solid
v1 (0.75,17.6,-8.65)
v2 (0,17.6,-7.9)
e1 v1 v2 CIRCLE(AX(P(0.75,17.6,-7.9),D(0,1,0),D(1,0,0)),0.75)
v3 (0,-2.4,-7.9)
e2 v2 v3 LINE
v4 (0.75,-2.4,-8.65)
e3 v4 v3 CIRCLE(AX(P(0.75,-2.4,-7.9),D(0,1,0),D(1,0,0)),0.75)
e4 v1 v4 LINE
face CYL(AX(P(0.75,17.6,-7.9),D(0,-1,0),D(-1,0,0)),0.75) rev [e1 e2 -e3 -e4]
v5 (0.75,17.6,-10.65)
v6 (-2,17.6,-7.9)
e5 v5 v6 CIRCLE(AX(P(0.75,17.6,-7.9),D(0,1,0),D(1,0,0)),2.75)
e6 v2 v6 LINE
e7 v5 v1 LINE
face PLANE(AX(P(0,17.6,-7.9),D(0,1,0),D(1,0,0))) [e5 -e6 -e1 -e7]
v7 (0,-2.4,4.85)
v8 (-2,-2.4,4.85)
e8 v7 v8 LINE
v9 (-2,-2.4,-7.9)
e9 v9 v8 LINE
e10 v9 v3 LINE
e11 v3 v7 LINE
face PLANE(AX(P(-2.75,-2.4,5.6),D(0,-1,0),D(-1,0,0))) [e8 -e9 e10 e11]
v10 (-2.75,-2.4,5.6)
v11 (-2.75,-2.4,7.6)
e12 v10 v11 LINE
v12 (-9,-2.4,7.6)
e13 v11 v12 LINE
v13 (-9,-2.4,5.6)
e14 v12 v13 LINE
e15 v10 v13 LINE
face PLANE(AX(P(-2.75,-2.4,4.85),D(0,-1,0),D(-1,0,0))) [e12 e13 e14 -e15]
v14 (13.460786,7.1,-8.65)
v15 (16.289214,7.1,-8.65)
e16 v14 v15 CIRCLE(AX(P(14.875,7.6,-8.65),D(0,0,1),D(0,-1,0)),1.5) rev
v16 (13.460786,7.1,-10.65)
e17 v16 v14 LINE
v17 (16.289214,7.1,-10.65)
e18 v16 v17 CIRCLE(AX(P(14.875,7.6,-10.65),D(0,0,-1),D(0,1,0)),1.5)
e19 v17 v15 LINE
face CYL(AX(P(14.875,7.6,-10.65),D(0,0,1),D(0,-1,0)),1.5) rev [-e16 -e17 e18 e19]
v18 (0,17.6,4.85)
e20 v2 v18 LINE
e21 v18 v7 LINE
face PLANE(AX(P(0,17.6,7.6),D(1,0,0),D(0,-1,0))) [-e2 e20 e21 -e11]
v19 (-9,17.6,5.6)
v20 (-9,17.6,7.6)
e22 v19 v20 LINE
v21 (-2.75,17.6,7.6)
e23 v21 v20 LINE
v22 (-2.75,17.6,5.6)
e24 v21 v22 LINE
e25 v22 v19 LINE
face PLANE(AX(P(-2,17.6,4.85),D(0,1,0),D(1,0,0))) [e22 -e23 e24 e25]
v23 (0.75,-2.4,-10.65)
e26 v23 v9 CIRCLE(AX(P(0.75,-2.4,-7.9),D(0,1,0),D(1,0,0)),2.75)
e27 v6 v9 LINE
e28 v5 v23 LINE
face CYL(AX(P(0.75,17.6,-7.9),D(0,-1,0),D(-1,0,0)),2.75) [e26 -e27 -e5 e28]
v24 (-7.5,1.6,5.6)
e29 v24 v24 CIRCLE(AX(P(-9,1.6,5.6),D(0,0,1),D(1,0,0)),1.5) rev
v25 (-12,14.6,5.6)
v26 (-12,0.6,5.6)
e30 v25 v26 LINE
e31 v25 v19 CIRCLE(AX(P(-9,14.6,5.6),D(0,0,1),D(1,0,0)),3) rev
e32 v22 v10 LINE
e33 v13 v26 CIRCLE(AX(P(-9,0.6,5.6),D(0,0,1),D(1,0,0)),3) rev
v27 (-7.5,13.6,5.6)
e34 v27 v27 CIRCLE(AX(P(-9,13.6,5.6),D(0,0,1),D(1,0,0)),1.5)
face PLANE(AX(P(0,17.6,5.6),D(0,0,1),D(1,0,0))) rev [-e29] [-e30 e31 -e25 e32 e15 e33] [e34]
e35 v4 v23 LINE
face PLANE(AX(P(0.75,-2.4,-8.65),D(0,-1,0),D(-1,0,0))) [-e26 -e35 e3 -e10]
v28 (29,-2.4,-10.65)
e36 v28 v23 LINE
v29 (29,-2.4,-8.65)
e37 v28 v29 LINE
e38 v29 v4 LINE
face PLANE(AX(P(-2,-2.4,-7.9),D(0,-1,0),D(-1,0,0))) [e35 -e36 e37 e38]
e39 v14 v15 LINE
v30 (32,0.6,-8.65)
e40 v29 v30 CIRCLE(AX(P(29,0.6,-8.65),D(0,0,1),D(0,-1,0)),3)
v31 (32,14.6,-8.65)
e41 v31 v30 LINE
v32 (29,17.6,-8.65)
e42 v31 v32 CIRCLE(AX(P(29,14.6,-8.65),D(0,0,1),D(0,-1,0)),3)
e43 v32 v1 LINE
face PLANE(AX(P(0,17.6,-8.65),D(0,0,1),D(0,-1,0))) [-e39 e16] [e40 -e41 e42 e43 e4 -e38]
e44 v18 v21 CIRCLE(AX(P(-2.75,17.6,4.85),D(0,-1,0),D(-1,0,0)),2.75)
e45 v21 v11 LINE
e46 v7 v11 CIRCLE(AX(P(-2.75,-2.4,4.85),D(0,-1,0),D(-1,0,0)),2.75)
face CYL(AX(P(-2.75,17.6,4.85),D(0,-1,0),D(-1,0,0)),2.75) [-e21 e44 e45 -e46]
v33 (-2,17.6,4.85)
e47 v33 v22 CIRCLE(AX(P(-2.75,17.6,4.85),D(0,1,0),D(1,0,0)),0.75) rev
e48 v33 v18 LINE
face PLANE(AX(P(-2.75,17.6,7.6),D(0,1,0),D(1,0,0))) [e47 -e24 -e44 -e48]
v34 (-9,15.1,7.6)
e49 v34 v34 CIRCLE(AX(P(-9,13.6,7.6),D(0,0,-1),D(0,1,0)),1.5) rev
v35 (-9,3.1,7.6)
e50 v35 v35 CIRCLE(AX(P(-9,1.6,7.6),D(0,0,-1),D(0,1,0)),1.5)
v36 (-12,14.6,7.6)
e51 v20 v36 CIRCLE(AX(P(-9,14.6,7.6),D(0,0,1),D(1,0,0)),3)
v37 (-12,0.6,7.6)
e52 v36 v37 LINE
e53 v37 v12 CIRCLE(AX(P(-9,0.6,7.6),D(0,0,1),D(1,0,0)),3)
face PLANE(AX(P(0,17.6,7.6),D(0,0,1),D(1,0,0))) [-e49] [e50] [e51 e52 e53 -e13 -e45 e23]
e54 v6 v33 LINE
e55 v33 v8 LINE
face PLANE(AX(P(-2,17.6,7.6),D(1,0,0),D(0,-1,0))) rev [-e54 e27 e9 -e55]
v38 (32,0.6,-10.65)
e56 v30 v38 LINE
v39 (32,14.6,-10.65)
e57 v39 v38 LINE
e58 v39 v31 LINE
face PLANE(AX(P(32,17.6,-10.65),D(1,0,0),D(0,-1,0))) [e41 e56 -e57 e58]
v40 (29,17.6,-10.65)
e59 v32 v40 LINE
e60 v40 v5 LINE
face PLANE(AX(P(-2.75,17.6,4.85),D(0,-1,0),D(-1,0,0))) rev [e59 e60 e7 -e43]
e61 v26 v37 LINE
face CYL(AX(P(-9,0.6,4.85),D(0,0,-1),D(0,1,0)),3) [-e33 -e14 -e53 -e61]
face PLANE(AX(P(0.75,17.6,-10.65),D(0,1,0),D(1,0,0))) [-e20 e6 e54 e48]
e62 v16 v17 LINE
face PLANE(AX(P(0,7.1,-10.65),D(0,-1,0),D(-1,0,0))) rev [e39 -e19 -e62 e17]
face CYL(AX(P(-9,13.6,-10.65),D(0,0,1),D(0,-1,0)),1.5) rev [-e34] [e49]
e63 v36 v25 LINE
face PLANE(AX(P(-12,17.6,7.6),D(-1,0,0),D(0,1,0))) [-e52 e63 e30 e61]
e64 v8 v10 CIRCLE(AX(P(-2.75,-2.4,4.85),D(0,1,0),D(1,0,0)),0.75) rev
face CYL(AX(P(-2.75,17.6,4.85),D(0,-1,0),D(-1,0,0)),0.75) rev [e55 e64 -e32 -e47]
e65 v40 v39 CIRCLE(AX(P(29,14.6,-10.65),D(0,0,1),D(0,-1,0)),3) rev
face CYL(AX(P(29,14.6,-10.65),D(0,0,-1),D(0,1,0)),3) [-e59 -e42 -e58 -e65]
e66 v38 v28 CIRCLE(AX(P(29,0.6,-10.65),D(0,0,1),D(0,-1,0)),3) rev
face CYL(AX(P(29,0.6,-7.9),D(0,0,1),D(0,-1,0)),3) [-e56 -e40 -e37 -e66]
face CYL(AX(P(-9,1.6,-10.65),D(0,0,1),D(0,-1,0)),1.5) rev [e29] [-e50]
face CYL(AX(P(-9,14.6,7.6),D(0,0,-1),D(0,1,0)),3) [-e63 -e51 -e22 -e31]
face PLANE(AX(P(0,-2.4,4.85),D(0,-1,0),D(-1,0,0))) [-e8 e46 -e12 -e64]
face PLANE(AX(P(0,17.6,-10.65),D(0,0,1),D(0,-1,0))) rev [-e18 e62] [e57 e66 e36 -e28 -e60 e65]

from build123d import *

# Parameters (mm, degrees)
BASE_FLANGE1_DEPTH    = 10
FILLET1_R             = 3
SKETCH7_R             = 1.5
CUT_EXTRUDE1_DEPTH    = 39.171488051
BODY_MOVE_COPY1_ANGLE = 90


# Sheet-metal steps are written as plain solids
with BuildPart() as part:
    # Sketch1 → Base-Flange1 (new, symmetric)
    with BuildSketch(Plane.XY):
        with BuildLine():
            Line((-12, 0), (-2.75, 0))
            ThreePointArc((-2.75, 0), (-0.805456352, 0.805456352), (0, 2.75))
            Line((0, 2.75), (0, 15.5))
            ThreePointArc((0, 15.5), (0.219669914, 16.030330086), (0.75, 16.25))
            Line((0.75, 16.25), (32, 16.25))
            Line((32, 16.25), (32, 18.25))
            Line((32, 18.25), (0.75, 18.25))
            ThreePointArc((0.75, 18.25), (-1.194543648, 17.444543648), (-2, 15.5))
            Line((-2, 15.5), (-2, 2.75))
            ThreePointArc((-2, 2.75), (-2.219669914, 2.219669914), (-2.75, 2))
            Line((-2.75, 2), (-12, 2))
            Line((-12, 2), (-12, 0))
        make_face()
    extrude(amount=BASE_FLANGE1_DEPTH, both=True)

    # Fillet1
    fillet1_edges = [part.edges().sort_by_distance(p)[0] for p in [
        (32, 17.25, -10),
        (-12, 1, -10),
        (32, 17.25, 10),
        (-12, 1, 10),
    ]]
    fillet(fillet1_edges, radius=FILLET1_R)

    # Sketch7 → Cut-Extrude1 (cut, through all)
    with BuildSketch(Plane(origin=(0, 0, 0), x_dir=(1, 0, 0), z_dir=(0, 1, 0))):
        with BuildLine():
            Line((16.289213562, 0.5), (13.460786438, 0.5))
            ThreePointArc((13.460786438, 0.5), (14.621347032, -1.478397839), (16.375, 0))
            ThreePointArc((16.375, 0), (16.353397839, 0.253652968), (16.289213562, 0.5))
        make_face()
        with Locations((-9, -6)):
            Circle(SKETCH7_R)
        with Locations((-9, 6)):
            Circle(SKETCH7_R)
    extrude(amount=CUT_EXTRUDE1_DEPTH, mode=Mode.SUBTRACT)


with BuildPart() as part_1:
    # Body-Move/Copy1: moved
    add(part.part.rotate(Axis((0, 7.6, 0), (-1, 0, 0)), BODY_MOVE_COPY1_ANGLE))


solid = part_1.part
